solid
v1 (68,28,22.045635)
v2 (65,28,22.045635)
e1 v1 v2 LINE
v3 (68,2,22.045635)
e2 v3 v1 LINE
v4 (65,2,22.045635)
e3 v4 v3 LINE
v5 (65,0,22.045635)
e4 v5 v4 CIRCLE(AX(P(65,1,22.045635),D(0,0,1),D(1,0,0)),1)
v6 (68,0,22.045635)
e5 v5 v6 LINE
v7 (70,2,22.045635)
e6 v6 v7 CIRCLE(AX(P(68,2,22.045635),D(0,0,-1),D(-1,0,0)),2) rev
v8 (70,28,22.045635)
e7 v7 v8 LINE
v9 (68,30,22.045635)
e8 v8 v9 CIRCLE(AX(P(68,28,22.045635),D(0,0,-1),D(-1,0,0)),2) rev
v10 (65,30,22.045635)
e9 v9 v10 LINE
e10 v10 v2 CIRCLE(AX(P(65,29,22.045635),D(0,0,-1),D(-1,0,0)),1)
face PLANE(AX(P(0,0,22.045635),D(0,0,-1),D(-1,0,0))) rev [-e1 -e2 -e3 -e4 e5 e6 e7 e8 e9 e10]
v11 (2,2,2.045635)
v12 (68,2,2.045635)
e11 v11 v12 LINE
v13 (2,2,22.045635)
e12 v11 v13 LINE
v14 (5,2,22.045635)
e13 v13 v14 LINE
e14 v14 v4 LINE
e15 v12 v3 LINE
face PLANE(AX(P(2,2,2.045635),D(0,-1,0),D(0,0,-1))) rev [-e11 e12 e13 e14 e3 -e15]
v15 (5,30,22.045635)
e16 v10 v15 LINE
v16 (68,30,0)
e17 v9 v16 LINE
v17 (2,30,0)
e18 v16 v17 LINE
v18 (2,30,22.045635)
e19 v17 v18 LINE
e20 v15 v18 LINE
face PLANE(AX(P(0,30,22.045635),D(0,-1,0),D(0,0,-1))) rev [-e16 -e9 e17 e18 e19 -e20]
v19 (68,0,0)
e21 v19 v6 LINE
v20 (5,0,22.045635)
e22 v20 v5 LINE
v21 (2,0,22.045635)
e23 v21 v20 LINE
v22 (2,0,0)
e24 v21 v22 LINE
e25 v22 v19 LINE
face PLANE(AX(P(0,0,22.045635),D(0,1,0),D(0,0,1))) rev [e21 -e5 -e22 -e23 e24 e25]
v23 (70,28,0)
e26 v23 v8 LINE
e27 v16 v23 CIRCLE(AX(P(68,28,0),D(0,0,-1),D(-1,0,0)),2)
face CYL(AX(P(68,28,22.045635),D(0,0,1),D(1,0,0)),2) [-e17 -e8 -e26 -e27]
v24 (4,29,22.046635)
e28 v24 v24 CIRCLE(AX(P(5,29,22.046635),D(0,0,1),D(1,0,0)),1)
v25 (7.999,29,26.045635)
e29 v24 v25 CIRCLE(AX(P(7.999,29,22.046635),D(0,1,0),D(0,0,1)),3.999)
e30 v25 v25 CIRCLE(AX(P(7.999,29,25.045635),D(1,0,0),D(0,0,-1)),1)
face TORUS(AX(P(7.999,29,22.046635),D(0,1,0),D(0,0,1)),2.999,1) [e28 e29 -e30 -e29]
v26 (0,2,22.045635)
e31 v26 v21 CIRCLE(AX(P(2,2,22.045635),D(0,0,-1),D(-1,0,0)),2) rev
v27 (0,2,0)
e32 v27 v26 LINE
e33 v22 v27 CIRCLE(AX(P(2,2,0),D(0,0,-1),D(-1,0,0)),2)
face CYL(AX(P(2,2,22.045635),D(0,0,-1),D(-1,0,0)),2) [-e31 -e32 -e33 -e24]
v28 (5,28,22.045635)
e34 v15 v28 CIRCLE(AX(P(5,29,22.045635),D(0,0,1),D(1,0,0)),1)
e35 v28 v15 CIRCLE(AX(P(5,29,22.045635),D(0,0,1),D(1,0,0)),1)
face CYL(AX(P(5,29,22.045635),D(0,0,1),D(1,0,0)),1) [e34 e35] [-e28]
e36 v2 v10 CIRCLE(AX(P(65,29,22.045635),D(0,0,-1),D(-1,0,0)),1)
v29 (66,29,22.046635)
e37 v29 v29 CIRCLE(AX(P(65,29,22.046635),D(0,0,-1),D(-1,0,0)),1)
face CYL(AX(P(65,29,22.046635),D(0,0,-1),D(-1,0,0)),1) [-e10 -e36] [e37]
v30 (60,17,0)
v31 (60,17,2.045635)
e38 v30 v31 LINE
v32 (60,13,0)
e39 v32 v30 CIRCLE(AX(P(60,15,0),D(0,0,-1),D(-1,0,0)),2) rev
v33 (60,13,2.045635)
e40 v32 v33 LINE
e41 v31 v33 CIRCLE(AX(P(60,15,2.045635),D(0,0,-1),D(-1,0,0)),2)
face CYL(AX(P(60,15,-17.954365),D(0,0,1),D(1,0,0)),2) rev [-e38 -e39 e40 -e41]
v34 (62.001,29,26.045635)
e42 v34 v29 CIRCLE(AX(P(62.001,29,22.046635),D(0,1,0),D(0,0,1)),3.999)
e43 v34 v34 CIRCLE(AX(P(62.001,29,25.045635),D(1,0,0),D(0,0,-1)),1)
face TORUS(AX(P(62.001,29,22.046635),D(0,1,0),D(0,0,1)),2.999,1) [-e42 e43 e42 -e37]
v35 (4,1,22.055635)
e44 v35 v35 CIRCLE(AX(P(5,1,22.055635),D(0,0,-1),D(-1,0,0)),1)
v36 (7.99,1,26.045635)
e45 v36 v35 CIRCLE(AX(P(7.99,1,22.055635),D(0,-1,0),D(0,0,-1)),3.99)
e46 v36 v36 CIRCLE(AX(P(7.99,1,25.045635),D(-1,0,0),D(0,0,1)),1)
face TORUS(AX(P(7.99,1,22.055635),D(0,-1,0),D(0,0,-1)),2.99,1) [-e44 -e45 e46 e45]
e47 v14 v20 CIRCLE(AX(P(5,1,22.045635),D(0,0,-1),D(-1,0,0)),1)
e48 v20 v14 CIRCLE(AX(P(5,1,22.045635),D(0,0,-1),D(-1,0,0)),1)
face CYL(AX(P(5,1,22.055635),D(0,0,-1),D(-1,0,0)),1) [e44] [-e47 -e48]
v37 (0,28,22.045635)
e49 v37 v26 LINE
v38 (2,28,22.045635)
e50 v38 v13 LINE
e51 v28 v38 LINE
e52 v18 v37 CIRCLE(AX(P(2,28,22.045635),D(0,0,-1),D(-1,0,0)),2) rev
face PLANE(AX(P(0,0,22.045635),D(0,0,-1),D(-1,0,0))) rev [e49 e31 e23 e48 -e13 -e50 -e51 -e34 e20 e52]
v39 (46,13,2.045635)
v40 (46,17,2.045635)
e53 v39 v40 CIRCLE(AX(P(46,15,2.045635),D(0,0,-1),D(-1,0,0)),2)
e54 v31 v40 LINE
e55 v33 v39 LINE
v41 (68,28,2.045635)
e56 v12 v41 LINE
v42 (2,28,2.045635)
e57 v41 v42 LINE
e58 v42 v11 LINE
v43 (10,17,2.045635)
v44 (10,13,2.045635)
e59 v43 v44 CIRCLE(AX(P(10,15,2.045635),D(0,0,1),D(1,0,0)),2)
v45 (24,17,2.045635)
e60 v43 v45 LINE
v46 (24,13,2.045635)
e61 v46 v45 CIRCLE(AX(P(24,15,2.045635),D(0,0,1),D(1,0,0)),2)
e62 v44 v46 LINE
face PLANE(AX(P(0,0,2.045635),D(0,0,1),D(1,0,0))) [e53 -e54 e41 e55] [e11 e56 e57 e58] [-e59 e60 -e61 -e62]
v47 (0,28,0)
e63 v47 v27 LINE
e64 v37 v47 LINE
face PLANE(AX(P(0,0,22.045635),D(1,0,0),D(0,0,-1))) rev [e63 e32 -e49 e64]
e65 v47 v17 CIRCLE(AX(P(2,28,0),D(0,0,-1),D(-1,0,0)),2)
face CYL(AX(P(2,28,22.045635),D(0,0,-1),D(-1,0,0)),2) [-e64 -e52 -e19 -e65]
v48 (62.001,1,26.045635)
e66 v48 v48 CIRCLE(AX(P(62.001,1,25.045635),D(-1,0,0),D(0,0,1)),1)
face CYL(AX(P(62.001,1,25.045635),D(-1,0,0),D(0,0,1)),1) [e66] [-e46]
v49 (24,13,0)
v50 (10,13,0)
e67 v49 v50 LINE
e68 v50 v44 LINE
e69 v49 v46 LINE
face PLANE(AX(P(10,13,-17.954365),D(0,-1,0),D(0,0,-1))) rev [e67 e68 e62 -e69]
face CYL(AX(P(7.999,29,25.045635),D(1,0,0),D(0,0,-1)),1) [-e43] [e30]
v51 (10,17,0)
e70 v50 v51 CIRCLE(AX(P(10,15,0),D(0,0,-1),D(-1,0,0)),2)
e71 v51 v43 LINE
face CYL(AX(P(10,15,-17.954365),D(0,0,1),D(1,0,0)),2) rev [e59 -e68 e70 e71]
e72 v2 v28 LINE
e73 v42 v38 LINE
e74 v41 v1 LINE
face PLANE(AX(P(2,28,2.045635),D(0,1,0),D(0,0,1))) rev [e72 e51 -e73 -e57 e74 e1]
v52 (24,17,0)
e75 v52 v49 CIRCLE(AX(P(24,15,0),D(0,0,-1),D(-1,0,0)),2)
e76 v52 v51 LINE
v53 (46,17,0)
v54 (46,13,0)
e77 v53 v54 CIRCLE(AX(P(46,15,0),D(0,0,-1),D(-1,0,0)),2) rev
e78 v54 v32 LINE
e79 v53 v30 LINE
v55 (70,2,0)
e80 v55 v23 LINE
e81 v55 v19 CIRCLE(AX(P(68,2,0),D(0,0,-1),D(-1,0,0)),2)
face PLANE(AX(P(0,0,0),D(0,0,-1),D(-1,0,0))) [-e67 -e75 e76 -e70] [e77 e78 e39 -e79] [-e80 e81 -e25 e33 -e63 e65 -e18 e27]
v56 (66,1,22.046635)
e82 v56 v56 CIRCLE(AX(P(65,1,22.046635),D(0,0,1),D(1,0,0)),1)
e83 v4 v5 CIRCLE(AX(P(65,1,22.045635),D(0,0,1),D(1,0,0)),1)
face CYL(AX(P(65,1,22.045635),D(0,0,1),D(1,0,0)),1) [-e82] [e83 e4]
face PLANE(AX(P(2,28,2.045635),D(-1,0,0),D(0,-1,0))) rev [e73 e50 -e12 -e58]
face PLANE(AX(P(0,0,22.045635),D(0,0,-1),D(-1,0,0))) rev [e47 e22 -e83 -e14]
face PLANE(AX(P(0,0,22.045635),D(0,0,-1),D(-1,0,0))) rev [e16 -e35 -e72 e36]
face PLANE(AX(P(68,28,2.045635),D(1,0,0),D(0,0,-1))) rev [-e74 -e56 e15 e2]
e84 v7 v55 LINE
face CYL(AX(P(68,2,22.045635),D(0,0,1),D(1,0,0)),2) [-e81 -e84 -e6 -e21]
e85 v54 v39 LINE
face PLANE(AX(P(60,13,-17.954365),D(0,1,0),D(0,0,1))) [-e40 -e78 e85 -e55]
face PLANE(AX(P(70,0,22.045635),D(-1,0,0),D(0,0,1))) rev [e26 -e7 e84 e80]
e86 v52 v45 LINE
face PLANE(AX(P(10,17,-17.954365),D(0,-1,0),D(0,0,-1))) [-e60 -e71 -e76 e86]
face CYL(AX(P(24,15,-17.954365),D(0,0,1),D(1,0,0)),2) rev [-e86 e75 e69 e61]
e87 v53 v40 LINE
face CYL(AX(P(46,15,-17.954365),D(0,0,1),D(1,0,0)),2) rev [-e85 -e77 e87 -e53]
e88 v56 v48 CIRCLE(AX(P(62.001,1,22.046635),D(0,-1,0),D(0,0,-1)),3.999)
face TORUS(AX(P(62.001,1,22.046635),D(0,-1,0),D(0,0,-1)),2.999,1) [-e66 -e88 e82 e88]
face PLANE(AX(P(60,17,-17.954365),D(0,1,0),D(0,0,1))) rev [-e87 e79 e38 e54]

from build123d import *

# Parameters (mm, degrees)
CROQUIS1_W              = 70
CROQUIS1_H              = 30
SALIENTE_EXTRUIR4_DEPTH = 22.045635187
CROQUIS5_W              = 66
CROQUIS5_H              = 26
CORTAR_EXTRUIR1_DEPTH   = 20
CORTAR_EXTRUIR3_DEPTH   = 20
REDONDEO2_R             = 2
REDONDEO3_R             = 2
REDONDEO4_R             = 2
REDONDEO5_R             = 2
BARRER8_OUTLINE_R       = 1
BARRER8_ANGLE           = 90
BARRER8_2_OUTLINE_R     = 1
BARRER8_2_ANGLE         = 90
BARRER8_START           = 21
BARRER8_3_OUTLINE_R     = 1
BARRER8_3_DEPTH         = 1.046635287
BARRER8_START_2         = 7.9899999
BARRER8_4_OUTLINE_R     = 1
BARRER8_4_DEPTH         = 54.0110002
BARRER8_5_OUTLINE_R     = 1
BARRER8_5_DEPTH         = 1.055635287
BARRER9_OUTLINE_R       = 1
BARRER9_ANGLE           = 90
BARRER9_2_OUTLINE_R     = 1
BARRER9_2_ANGLE         = 90
BARRER9_START           = 21
BARRER9_3_OUTLINE_R     = 1
BARRER9_3_DEPTH         = 1.046635287
BARRER9_START_2         = 7.9989999
BARRER9_4_OUTLINE_R     = 1
BARRER9_4_DEPTH         = 54.0020002
BARRER9_5_OUTLINE_R     = 1
BARRER9_5_DEPTH         = 1.046635287


with BuildPart() as part:
    # Croquis1 → Saliente-Extruir4 (new body)
    with BuildSketch(Plane.XY):
        with Locations((35, 15)):
            Rectangle(CROQUIS1_W, CROQUIS1_H)
    extrude(amount=SALIENTE_EXTRUIR4_DEPTH)

    # Croquis5 → Cortar-Extruir1 (cut)
    with BuildSketch(Plane.XY.offset(22.045635187)):
        with Locations((35, 15)):
            Rectangle(CROQUIS5_W, CROQUIS5_H)
    extrude(amount=-CORTAR_EXTRUIR1_DEPTH, mode=Mode.SUBTRACT)

    # Croquis6 → Cortar-Extruir3 (cut)
    with BuildSketch(Plane.XY.offset(2.045635187)):
        with BuildLine():
            Line((10, 17), (24, 17))
            ThreePointArc((24, 17), (26, 15), (24, 13))
            Line((24, 13), (10, 13))
            ThreePointArc((10, 13), (8, 15), (10, 17))
        make_face()
        with BuildLine():
            Line((60, 17), (46, 17))
            ThreePointArc((46, 17), (44, 15), (46, 13))
            Line((46, 13), (60, 13))
            ThreePointArc((60, 13), (62, 15), (60, 17))
        make_face()
    extrude(amount=-CORTAR_EXTRUIR3_DEPTH, mode=Mode.SUBTRACT)

    # Redondeo2
    redondeo2_edges = [part.edges().sort_by_distance(p)[0] for p in [
        (70, 0, 11.022817594),
    ]]
    fillet(redondeo2_edges, radius=REDONDEO2_R)

    # Redondeo3
    redondeo3_edges = [part.edges().sort_by_distance(p)[0] for p in [
        (70, 30, 11.022817594),
    ]]
    fillet(redondeo3_edges, radius=REDONDEO3_R)

    # Redondeo4
    redondeo4_edges = [part.edges().sort_by_distance(p)[0] for p in [
        (0, 0, 11.022817594),
    ]]
    fillet(redondeo4_edges, radius=REDONDEO4_R)

    # Redondeo5
    redondeo5_edges = [part.edges().sort_by_distance(p)[0] for p in [
        (0, 30, 11.022817594),
    ]]
    fillet(redondeo5_edges, radius=REDONDEO5_R)

    # Barrer8 3 outline → Barrer8 3 (add)
    with BuildSketch(Plane.XY.offset(BARRER8_START)):
        with Locations((65, 1)):
            Circle(BARRER8_3_OUTLINE_R)
    extrude(amount=BARRER8_3_DEPTH)



with BuildPart() as body_2:
    # Barrer8: read off the stored shape, not the designer's step
    # Barrer8 outline → Barrer8 (revolve)
    with BuildSketch(Plane(origin=(62.001, 0, 22.046635187), x_dir=(0, 0, 1), z_dir=(-1, 0, 0))):
        with Locations((2.999, 1)):
            Circle(BARRER8_OUTLINE_R)
    revolve(axis=Axis((62.001, 0, 22.046635187), (0, 1, 0)), revolution_arc=BARRER8_ANGLE)



with BuildPart() as body_3:
    # Barrer8 2 outline → Barrer8 2 (revolve)
    with BuildSketch(Plane(origin=(7.99, 0, 22.055635187), x_dir=(-1, 0, 0), z_dir=(0, 0, -1))):
        with Locations((2.99, 1)):
            Circle(BARRER8_2_OUTLINE_R)
    revolve(axis=Axis((7.99, 0, 22.055635187), (0, 1, 0)), revolution_arc=BARRER8_2_ANGLE)


with BuildPart() as body_2_1:
    add(body_2.part)

    add(body_3.part)  # Barrer8 4 merges body 3
    # Barrer8 4 outline → Barrer8 4 (add)
    with BuildSketch(Plane.YZ.offset(BARRER8_START_2)):
        with Locations((1, 25.045635187)):
            Circle(BARRER8_4_OUTLINE_R)
    extrude(amount=BARRER8_4_DEPTH)


with BuildPart() as part_1:
    add(part.part)

    add(body_2_1.part)  # Barrer8 5 merges body 2
    # Barrer8 5 outline → Barrer8 5 (add)
    with BuildSketch(Plane.XY.offset(BARRER8_START)):
        with Locations((5, 1)):
            Circle(BARRER8_5_OUTLINE_R)
    extrude(amount=BARRER8_5_DEPTH)

    # Barrer9 3 outline → Barrer9 3 (add)
    with BuildSketch(Plane.XY.offset(BARRER9_START)):
        with Locations((5, 29)):
            Circle(BARRER9_3_OUTLINE_R)
    extrude(amount=BARRER9_3_DEPTH)



with BuildPart() as body_2_2:
    # Barrer9: read off the stored shape, not the designer's step
    # Barrer9 outline → Barrer9 (revolve)
    with BuildSketch(Plane(origin=(7.999, 0, 22.046635187), x_dir=(-1, 0, 0), z_dir=(0, 0, -1))):
        with Locations((2.999, 29)):
            Circle(BARRER9_OUTLINE_R)
    revolve(axis=Axis((7.999, 0, 22.046635187), (0, 1, 0)), revolution_arc=BARRER9_ANGLE)



with BuildPart() as body_3_2:
    # Barrer9 2 outline → Barrer9 2 (revolve)
    with BuildSketch(Plane(origin=(62.001, 0, 22.046635187), x_dir=(0, 0, 1), z_dir=(-1, 0, 0))):
        with Locations((2.999, 29)):
            Circle(BARRER9_2_OUTLINE_R)
    revolve(axis=Axis((62.001, 0, 22.046635187), (0, 1, 0)), revolution_arc=BARRER9_2_ANGLE)


with BuildPart() as body_2_2_1:
    add(body_2_2.part)

    add(body_3_2.part)  # Barrer9 4 merges body 3 2
    # Barrer9 4 outline → Barrer9 4 (add)
    with BuildSketch(Plane.YZ.offset(BARRER9_START_2)):
        with Locations((29, 25.045635187)):
            Circle(BARRER9_4_OUTLINE_R)
    extrude(amount=BARRER9_4_DEPTH)


with BuildPart() as part_2:
    add(part_1.part)

    add(body_2_2_1.part)  # Barrer9 5 merges body 2 2
    # Barrer9 5 outline → Barrer9 5 (add)
    with BuildSketch(Plane.XY.offset(BARRER9_START)):
        with Locations((65, 29)):
            Circle(BARRER9_5_OUTLINE_R)
    extrude(amount=BARRER9_5_DEPTH)


solid = part_2.part
